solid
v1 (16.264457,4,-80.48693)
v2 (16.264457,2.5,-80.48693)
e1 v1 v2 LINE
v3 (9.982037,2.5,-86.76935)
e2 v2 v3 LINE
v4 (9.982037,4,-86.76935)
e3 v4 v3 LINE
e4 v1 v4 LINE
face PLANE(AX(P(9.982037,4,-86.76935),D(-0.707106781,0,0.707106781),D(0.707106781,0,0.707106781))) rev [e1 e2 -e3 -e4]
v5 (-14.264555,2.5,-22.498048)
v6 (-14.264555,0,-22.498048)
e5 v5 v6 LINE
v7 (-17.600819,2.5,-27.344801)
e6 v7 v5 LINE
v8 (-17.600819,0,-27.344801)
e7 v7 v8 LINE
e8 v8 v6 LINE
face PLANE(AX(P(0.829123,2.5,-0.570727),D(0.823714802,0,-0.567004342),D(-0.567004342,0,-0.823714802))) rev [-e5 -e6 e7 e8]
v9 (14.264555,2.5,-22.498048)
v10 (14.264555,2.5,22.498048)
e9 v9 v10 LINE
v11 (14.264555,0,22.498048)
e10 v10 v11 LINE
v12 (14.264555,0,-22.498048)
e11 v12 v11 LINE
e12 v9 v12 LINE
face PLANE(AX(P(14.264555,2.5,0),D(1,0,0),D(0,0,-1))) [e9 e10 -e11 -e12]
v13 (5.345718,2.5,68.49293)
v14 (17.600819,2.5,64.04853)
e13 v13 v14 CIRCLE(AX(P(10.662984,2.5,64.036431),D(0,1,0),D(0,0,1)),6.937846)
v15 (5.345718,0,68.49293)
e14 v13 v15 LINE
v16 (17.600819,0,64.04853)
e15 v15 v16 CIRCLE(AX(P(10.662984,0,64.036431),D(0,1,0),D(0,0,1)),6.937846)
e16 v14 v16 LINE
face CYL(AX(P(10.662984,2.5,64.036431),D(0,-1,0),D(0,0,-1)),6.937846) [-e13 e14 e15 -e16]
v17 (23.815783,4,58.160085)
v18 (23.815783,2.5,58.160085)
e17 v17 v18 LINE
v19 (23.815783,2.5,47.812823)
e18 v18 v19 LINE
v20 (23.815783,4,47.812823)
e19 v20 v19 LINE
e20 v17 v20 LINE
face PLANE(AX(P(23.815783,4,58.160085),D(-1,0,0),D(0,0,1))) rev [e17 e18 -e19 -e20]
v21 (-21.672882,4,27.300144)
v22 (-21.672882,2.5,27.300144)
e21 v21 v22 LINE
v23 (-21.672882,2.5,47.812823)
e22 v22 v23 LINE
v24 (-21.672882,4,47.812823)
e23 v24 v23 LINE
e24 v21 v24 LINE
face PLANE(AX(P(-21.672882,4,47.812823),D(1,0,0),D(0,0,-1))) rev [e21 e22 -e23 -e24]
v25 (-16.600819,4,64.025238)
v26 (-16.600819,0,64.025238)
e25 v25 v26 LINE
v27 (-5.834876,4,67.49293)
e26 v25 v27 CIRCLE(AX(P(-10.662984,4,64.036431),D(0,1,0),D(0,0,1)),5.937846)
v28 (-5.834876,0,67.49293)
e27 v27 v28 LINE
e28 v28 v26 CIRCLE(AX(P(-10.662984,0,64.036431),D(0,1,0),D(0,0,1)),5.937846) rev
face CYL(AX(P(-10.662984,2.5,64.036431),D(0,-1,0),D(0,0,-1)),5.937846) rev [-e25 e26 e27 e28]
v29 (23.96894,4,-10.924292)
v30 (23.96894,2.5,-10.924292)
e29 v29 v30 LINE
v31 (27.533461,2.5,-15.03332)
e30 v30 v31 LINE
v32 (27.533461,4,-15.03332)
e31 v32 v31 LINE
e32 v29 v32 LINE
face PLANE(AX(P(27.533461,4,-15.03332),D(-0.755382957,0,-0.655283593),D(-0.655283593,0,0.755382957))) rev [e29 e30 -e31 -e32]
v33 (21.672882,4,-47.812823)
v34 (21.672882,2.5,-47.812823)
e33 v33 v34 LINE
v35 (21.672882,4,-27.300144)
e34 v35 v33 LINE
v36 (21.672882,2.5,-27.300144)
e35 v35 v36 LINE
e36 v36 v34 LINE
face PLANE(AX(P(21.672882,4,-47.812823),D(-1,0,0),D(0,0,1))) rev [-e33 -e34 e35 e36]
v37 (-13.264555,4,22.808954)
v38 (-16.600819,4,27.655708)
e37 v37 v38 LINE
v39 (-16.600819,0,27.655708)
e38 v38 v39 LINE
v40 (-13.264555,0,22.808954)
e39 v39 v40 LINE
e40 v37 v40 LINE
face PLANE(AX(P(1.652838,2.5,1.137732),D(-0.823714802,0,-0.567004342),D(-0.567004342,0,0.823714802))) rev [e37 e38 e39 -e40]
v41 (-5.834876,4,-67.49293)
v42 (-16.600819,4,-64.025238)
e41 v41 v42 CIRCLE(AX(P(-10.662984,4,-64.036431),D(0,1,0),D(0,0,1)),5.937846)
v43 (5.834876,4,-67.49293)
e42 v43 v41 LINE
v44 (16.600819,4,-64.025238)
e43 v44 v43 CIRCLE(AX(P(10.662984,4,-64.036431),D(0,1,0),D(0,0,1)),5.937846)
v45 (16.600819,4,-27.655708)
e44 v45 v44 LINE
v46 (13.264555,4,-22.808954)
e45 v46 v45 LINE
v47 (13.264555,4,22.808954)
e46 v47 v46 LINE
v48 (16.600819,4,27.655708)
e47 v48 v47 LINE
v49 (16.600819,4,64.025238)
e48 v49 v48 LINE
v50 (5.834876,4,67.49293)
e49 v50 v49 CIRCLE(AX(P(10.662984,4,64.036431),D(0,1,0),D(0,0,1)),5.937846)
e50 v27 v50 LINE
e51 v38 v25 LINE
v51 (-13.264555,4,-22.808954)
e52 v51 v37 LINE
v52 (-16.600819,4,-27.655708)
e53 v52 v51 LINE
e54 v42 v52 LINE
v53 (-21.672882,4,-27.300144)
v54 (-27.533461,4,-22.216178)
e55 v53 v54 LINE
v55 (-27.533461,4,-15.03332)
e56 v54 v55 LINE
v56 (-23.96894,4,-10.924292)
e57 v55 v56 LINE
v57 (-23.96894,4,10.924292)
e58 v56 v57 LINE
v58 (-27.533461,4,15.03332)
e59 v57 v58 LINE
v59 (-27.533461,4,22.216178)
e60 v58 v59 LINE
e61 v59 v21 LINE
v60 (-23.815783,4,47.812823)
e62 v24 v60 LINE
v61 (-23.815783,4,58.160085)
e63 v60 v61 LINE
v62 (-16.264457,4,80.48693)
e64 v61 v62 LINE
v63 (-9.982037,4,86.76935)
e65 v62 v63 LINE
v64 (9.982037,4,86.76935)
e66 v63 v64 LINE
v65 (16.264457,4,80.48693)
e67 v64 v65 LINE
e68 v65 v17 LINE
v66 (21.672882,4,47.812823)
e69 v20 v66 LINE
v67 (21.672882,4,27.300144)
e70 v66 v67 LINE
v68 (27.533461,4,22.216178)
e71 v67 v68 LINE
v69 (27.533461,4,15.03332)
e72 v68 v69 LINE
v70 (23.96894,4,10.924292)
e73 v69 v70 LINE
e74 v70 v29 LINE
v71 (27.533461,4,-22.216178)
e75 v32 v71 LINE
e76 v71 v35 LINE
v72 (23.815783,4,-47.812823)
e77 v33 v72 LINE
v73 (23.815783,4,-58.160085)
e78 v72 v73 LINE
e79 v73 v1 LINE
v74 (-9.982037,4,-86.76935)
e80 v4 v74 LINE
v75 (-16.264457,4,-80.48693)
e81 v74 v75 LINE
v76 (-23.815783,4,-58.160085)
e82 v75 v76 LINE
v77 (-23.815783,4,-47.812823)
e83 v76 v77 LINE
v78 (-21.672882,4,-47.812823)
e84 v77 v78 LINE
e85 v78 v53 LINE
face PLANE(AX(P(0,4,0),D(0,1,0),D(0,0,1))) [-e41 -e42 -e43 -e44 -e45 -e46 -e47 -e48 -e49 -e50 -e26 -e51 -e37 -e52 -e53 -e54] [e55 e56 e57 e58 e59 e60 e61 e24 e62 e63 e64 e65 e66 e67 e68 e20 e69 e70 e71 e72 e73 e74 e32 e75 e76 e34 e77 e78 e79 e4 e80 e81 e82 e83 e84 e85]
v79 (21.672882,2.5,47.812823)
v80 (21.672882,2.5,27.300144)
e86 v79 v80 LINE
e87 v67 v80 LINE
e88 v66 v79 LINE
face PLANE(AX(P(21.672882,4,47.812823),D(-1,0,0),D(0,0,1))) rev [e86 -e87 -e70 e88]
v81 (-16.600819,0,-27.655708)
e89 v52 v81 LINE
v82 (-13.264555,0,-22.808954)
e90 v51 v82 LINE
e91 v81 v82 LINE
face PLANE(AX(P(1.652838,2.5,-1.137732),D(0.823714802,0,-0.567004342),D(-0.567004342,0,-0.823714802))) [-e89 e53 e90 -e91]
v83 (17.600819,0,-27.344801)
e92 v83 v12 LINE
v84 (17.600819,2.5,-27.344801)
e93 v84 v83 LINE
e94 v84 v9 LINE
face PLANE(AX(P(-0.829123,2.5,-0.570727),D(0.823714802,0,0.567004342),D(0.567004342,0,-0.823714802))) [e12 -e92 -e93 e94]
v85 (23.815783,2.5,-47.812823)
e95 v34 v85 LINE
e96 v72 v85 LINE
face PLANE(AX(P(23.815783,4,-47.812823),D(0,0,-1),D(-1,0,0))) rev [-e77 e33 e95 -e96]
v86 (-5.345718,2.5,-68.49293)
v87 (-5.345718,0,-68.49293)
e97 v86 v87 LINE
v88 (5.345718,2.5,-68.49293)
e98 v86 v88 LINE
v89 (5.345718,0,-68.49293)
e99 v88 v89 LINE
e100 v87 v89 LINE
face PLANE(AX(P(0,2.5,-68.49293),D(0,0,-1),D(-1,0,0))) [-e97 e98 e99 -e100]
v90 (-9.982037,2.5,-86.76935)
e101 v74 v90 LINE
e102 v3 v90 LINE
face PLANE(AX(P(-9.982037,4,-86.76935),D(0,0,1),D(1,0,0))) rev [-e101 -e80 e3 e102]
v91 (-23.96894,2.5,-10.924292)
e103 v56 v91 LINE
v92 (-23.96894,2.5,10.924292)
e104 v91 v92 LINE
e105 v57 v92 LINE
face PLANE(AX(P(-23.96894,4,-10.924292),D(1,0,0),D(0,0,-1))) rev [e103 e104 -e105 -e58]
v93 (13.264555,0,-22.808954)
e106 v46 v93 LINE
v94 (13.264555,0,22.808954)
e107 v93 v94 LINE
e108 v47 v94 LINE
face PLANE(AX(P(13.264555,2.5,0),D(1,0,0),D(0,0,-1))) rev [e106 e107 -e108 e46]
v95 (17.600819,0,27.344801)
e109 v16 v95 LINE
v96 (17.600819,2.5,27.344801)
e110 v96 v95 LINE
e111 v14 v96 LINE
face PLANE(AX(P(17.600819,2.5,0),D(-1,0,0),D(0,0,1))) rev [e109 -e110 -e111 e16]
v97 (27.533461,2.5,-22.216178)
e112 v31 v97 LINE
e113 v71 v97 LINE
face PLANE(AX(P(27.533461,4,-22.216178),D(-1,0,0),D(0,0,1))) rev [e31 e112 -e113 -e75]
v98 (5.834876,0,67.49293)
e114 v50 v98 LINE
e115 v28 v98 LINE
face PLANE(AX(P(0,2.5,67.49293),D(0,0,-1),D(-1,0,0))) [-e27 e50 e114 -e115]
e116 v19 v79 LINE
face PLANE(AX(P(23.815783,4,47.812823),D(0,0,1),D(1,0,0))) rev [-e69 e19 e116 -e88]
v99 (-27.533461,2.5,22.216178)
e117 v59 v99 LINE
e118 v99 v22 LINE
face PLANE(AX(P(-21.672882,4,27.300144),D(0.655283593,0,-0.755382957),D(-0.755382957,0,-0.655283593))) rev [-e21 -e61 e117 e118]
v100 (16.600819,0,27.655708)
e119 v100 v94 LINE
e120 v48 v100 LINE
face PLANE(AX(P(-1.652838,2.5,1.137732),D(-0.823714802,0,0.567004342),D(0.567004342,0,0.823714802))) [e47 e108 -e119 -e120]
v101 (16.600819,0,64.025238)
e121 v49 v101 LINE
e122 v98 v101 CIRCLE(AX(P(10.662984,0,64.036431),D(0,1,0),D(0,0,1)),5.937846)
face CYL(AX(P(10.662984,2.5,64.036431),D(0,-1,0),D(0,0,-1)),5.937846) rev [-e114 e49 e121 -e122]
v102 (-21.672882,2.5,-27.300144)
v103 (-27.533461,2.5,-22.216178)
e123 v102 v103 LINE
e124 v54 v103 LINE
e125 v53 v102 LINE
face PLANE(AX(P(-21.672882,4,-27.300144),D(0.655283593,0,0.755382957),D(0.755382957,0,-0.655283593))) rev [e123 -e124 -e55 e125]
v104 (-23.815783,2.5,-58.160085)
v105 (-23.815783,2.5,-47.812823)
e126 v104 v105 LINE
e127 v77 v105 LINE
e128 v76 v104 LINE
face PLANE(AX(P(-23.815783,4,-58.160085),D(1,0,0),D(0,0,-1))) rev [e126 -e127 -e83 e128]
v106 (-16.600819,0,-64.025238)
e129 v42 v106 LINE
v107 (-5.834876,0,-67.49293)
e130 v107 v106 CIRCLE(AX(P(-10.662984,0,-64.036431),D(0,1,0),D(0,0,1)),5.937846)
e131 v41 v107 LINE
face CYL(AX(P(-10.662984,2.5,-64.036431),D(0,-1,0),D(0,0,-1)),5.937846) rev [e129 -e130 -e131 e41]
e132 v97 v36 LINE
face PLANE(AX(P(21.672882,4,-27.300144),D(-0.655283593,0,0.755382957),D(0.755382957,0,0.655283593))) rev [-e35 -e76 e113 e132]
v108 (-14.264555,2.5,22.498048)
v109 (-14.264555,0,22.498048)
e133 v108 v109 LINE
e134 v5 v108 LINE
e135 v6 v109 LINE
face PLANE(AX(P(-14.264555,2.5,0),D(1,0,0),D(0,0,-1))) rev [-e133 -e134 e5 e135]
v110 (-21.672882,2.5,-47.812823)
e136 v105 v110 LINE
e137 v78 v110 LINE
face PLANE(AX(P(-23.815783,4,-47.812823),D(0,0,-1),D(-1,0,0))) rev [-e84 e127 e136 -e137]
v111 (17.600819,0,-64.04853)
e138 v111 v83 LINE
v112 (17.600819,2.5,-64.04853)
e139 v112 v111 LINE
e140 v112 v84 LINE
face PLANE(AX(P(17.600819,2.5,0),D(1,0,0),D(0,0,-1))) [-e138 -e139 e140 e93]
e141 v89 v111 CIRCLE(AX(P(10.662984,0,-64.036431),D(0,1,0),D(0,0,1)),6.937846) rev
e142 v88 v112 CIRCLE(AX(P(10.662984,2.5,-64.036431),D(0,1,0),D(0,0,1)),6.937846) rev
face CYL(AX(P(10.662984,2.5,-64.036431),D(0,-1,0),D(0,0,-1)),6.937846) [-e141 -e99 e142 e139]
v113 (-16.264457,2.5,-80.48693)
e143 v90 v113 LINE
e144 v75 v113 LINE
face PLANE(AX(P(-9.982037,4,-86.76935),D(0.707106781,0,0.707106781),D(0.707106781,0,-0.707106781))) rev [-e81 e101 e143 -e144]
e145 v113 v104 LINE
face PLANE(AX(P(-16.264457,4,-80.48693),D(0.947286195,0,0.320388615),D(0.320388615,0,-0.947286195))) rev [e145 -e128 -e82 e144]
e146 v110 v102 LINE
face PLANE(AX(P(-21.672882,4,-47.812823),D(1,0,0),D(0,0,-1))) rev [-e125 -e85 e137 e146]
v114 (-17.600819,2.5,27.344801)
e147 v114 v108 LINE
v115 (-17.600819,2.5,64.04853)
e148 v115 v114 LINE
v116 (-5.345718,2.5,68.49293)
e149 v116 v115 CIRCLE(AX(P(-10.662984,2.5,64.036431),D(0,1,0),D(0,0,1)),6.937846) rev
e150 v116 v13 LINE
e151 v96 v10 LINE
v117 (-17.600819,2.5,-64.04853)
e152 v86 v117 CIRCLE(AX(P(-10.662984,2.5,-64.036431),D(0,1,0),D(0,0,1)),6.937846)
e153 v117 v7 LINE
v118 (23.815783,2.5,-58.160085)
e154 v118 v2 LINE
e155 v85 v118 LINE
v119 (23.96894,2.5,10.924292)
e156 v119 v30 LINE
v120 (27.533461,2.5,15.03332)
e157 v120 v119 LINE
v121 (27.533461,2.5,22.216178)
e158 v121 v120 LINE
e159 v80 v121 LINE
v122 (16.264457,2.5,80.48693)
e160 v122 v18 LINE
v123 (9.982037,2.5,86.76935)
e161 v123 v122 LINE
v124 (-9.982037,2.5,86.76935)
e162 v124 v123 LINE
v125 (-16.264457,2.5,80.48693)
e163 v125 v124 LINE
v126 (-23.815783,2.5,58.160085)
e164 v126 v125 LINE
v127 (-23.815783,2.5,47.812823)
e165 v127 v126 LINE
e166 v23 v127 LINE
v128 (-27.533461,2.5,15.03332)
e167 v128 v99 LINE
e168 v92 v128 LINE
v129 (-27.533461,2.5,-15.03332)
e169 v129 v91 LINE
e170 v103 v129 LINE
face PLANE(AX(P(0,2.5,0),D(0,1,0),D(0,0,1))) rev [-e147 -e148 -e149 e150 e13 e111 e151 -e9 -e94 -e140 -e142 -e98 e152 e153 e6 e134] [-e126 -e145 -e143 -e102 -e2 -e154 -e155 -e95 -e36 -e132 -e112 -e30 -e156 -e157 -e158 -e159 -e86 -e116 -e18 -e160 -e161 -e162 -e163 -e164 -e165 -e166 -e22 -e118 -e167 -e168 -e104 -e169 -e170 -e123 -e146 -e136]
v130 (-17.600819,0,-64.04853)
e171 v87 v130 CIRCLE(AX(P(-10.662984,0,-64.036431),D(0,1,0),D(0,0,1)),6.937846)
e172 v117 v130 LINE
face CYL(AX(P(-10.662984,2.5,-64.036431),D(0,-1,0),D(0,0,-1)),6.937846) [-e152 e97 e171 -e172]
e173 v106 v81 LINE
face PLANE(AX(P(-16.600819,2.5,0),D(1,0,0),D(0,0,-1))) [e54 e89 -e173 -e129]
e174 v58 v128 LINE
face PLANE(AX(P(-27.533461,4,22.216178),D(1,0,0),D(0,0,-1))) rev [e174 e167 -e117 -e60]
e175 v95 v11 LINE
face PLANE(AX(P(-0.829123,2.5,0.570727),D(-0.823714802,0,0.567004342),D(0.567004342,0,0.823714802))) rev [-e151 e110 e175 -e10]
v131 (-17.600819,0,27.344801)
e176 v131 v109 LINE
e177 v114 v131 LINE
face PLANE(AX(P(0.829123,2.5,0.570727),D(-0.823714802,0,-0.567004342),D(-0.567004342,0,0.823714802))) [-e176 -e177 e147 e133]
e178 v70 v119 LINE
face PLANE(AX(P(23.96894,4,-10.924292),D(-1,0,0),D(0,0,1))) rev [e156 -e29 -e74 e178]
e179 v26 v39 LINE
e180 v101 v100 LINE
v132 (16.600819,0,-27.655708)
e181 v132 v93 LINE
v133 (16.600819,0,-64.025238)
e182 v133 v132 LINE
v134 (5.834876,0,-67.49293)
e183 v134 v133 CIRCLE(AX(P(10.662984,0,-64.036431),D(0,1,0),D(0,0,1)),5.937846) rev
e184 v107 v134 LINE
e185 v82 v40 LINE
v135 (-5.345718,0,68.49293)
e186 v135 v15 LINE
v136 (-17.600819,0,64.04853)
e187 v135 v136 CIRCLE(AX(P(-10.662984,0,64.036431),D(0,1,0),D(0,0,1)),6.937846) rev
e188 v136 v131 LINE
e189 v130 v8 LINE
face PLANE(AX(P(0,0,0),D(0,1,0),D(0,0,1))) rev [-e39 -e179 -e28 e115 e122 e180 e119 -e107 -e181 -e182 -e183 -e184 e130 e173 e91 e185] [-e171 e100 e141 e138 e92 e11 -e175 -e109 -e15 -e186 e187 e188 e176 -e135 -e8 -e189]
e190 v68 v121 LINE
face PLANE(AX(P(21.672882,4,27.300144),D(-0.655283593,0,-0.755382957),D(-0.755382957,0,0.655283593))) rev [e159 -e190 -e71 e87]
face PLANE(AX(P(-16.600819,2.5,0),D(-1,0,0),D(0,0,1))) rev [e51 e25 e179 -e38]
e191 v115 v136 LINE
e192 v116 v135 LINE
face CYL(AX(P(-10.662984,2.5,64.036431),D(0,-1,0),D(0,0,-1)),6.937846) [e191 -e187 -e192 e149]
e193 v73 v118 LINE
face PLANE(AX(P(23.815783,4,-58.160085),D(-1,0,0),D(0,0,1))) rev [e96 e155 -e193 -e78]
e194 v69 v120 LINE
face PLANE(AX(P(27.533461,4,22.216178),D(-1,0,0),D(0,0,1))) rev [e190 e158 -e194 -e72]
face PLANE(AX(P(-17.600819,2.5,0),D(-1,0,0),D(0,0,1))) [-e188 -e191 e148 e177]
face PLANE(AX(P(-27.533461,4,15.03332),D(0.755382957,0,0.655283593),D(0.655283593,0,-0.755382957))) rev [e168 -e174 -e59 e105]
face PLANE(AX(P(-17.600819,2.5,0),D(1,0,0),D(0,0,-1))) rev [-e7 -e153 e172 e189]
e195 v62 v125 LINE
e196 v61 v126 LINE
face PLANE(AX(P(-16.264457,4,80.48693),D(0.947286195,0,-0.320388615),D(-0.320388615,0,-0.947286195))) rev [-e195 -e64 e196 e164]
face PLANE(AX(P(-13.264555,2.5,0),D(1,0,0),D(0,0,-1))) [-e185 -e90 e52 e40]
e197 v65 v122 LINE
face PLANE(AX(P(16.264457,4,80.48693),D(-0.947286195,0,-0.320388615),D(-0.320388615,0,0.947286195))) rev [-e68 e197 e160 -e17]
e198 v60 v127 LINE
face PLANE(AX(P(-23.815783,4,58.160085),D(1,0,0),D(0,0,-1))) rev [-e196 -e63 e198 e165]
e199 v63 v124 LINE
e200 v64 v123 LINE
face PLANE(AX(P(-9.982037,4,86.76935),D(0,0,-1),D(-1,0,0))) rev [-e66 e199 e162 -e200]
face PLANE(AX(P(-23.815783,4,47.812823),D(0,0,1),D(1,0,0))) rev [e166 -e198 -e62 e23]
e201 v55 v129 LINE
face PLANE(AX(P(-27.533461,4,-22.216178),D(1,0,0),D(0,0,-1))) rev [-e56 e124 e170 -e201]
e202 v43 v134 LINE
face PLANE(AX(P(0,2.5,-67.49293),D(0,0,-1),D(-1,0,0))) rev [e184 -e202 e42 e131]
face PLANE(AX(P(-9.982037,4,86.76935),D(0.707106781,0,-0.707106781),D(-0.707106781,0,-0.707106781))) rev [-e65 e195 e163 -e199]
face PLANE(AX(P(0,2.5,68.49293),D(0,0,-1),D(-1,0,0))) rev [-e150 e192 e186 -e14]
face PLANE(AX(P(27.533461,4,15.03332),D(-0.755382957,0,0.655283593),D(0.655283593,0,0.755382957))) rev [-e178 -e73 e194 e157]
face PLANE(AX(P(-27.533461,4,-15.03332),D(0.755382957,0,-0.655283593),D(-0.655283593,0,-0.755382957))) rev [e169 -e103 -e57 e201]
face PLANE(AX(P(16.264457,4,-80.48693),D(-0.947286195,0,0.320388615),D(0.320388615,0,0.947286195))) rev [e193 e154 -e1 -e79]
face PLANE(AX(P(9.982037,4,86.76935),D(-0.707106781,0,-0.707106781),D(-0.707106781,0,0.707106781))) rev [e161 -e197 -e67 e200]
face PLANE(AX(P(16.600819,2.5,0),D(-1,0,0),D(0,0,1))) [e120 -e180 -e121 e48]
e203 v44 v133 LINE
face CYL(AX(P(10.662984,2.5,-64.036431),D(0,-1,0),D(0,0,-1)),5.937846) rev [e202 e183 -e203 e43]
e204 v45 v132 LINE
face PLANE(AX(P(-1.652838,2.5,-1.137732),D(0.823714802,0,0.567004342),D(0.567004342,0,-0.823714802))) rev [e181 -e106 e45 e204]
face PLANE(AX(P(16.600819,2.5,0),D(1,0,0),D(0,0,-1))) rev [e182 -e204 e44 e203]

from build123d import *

# Parameters (mm, degrees)
BOSS_EXTRUDE1_DEPTH = 2.5
BOSS_EXTRUDE3_DEPTH = 1.5


# Read off the part's stored shape, not the designer's step: Boss-Extrude1
with BuildPart() as part:
    # Boss-Extrude1 outline → Boss-Extrude1 (new body)
    with BuildSketch(Plane(origin=(0, 0, 0), x_dir=(1, 0, 0), z_dir=(0, 1, 0))):
        with BuildLine():
            ThreePointArc((17.600819084, 64.048530094), (13.028302904, 70.558621532), (5.345717729, 68.492930418))
            Line((5.345717729, 68.492930418), (-5.345717729, 68.492930418))
            ThreePointArc((-5.345717729, 68.492930418), (-13.028302904, 70.558621532), (-17.600819084, 64.048530094))
            Line((-17.600819084, 64.048530094), (-17.600819084, 27.344801488))
            Line((-17.600819084, 27.344801488), (-14.264554689, 22.498047837))
            Line((-14.264554689, 22.498047837), (-14.264554689, -22.498047837))
            Line((-14.264554689, -22.498047837), (-17.600819084, -27.344801488))
            Line((-17.600819084, -27.344801488), (-17.600819084, -64.048530094))
            ThreePointArc((-17.600819084, -64.048530094), (-13.028302904, -70.558621532), (-5.345717729, -68.492930418))
            Line((-5.345717729, -68.492930418), (5.345717729, -68.492930418))
            ThreePointArc((5.345717729, -68.492930418), (13.028302904, -70.558621532), (17.600819084, -64.048530094))
            Line((17.600819084, -64.048530094), (17.600819084, -27.344801488))
            Line((17.600819084, -27.344801488), (14.264554689, -22.498047837))
            Line((14.264554689, -22.498047837), (14.264554689, 22.498047837))
            Line((14.264554689, 22.498047837), (17.600819084, 27.344801488))
            Line((17.600819084, 27.344801488), (17.600819084, 64.048530094))
        make_face()
        with BuildLine():
            Line((16.600819084, -27.655707745), (16.600819084, -64.025237528))
            ThreePointArc((16.600819084, -64.025237528), (12.483449957, -69.688325839), (5.834875923, -67.492930418))
            Line((5.834875923, -67.492930418), (-5.834875923, -67.492930418))
            ThreePointArc((-5.834875923, -67.492930418), (-12.483449957, -69.688325839), (-16.600819084, -64.025237528))
            Line((-16.600819084, -64.025237528), (-16.600819084, -27.655707745))
            Line((-16.600819084, -27.655707745), (-13.264554689, -22.808954094))
            Line((-13.264554689, -22.808954094), (-13.264554689, 22.808954094))
            Line((-13.264554689, 22.808954094), (-16.600819084, 27.655707745))
            Line((-16.600819084, 27.655707745), (-16.600819084, 64.025237528))
            ThreePointArc((-16.600819084, 64.025237528), (-12.483449957, 69.688325839), (-5.834875923, 67.492930418))
            Line((-5.834875923, 67.492930418), (5.834875923, 67.492930418))
            ThreePointArc((5.834875923, 67.492930418), (12.483449957, 69.688325839), (16.600819084, 64.025237528))
            Line((16.600819084, 64.025237528), (16.600819084, 27.655707745))
            Line((16.600819084, 27.655707745), (13.264554689, 22.808954094))
            Line((13.264554689, 22.808954094), (13.264554689, -22.808954094))
            Line((13.264554689, -22.808954094), (16.600819084, -27.655707745))
        make_face(mode=Mode.SUBTRACT)
    extrude(amount=BOSS_EXTRUDE1_DEPTH)

    # Sketch4 → Boss-Extrude3 (add)
    with BuildSketch(Plane(origin=(0, 2.5, 0), x_dir=(1, 0, 0), z_dir=(0, 1, 0))):
        Polygon((-9.982037134, 86.769350006), (9.982037134, 86.769350006), (16.264456892, 80.486930248), (23.81578312, 58.16008483), (23.81578312, 47.812822946), (21.672882272, 47.812822946), (21.672882272, 27.300144084), (27.53346101, 22.216178317), (27.53346101, 15.033319747), (23.968939697, 10.924291721), (23.968939697, -10.924291721), (27.53346101, -15.033319747), (27.53346101, -22.216178317), (21.672882272, -27.300144084), (21.672882272, -47.812822946), (23.81578312, -47.812822946), (23.81578312, -58.16008483), (16.264456892, -80.486930248), (9.982037134, -86.769350006), (-9.982037134, -86.769350006), (-16.264456892, -80.486930248), (-23.81578312, -58.16008483), (-23.81578312, -47.812822946), (-21.672882272, -47.812822946), (-21.672882272, -27.300144084), (-27.53346101, -22.216178317), (-27.53346101, -15.033319747), (-23.968939697, -10.924291721), (-23.968939697, 10.924291721), (-27.53346101, 15.033319747), (-27.53346101, 22.216178317), (-21.672882272, 27.300144084), (-21.672882272, 47.812822946), (-23.81578312, 47.812822946), (-23.81578312, 58.16008483), (-16.264456892, 80.486930248), align=None)
        with BuildLine():
            Line((13.264554689, 22.808954094), (13.264554689, -22.808954094))
            Line((13.264554689, -22.808954094), (16.600819084, -27.655707745))
            Line((16.600819084, -27.655707745), (16.600819084, -64.025237528))
            ThreePointArc((16.600819084, -64.025237528), (12.483449957, -69.688325839), (5.834875923, -67.492930418))
            Line((5.834875923, -67.492930418), (-5.834875923, -67.492930418))
            ThreePointArc((-5.834875923, -67.492930418), (-12.483449957, -69.688325839), (-16.600819084, -64.025237528))
            Line((-16.600819084, -64.025237528), (-16.600819084, -27.655707745))
            Line((-16.600819084, -27.655707745), (-13.264554689, -22.808954094))
            Line((-13.264554689, -22.808954094), (-13.264554689, 22.808954094))
            Line((-13.264554689, 22.808954094), (-16.600819084, 27.655707745))
            Line((-16.600819084, 27.655707745), (-16.600819084, 64.025237528))
            ThreePointArc((-16.600819084, 64.025237528), (-12.483449957, 69.688325839), (-5.834875923, 67.492930418))
            Line((-5.834875923, 67.492930418), (5.834875923, 67.492930418))
            ThreePointArc((5.834875923, 67.492930418), (12.483449957, 69.688325839), (16.600819084, 64.025237528))
            Line((16.600819084, 64.025237528), (16.600819084, 27.655707745))
            Line((16.600819084, 27.655707745), (13.264554689, 22.808954094))
        make_face(mode=Mode.SUBTRACT)
    extrude(amount=BOSS_EXTRUDE3_DEPTH)


solid = part.part
